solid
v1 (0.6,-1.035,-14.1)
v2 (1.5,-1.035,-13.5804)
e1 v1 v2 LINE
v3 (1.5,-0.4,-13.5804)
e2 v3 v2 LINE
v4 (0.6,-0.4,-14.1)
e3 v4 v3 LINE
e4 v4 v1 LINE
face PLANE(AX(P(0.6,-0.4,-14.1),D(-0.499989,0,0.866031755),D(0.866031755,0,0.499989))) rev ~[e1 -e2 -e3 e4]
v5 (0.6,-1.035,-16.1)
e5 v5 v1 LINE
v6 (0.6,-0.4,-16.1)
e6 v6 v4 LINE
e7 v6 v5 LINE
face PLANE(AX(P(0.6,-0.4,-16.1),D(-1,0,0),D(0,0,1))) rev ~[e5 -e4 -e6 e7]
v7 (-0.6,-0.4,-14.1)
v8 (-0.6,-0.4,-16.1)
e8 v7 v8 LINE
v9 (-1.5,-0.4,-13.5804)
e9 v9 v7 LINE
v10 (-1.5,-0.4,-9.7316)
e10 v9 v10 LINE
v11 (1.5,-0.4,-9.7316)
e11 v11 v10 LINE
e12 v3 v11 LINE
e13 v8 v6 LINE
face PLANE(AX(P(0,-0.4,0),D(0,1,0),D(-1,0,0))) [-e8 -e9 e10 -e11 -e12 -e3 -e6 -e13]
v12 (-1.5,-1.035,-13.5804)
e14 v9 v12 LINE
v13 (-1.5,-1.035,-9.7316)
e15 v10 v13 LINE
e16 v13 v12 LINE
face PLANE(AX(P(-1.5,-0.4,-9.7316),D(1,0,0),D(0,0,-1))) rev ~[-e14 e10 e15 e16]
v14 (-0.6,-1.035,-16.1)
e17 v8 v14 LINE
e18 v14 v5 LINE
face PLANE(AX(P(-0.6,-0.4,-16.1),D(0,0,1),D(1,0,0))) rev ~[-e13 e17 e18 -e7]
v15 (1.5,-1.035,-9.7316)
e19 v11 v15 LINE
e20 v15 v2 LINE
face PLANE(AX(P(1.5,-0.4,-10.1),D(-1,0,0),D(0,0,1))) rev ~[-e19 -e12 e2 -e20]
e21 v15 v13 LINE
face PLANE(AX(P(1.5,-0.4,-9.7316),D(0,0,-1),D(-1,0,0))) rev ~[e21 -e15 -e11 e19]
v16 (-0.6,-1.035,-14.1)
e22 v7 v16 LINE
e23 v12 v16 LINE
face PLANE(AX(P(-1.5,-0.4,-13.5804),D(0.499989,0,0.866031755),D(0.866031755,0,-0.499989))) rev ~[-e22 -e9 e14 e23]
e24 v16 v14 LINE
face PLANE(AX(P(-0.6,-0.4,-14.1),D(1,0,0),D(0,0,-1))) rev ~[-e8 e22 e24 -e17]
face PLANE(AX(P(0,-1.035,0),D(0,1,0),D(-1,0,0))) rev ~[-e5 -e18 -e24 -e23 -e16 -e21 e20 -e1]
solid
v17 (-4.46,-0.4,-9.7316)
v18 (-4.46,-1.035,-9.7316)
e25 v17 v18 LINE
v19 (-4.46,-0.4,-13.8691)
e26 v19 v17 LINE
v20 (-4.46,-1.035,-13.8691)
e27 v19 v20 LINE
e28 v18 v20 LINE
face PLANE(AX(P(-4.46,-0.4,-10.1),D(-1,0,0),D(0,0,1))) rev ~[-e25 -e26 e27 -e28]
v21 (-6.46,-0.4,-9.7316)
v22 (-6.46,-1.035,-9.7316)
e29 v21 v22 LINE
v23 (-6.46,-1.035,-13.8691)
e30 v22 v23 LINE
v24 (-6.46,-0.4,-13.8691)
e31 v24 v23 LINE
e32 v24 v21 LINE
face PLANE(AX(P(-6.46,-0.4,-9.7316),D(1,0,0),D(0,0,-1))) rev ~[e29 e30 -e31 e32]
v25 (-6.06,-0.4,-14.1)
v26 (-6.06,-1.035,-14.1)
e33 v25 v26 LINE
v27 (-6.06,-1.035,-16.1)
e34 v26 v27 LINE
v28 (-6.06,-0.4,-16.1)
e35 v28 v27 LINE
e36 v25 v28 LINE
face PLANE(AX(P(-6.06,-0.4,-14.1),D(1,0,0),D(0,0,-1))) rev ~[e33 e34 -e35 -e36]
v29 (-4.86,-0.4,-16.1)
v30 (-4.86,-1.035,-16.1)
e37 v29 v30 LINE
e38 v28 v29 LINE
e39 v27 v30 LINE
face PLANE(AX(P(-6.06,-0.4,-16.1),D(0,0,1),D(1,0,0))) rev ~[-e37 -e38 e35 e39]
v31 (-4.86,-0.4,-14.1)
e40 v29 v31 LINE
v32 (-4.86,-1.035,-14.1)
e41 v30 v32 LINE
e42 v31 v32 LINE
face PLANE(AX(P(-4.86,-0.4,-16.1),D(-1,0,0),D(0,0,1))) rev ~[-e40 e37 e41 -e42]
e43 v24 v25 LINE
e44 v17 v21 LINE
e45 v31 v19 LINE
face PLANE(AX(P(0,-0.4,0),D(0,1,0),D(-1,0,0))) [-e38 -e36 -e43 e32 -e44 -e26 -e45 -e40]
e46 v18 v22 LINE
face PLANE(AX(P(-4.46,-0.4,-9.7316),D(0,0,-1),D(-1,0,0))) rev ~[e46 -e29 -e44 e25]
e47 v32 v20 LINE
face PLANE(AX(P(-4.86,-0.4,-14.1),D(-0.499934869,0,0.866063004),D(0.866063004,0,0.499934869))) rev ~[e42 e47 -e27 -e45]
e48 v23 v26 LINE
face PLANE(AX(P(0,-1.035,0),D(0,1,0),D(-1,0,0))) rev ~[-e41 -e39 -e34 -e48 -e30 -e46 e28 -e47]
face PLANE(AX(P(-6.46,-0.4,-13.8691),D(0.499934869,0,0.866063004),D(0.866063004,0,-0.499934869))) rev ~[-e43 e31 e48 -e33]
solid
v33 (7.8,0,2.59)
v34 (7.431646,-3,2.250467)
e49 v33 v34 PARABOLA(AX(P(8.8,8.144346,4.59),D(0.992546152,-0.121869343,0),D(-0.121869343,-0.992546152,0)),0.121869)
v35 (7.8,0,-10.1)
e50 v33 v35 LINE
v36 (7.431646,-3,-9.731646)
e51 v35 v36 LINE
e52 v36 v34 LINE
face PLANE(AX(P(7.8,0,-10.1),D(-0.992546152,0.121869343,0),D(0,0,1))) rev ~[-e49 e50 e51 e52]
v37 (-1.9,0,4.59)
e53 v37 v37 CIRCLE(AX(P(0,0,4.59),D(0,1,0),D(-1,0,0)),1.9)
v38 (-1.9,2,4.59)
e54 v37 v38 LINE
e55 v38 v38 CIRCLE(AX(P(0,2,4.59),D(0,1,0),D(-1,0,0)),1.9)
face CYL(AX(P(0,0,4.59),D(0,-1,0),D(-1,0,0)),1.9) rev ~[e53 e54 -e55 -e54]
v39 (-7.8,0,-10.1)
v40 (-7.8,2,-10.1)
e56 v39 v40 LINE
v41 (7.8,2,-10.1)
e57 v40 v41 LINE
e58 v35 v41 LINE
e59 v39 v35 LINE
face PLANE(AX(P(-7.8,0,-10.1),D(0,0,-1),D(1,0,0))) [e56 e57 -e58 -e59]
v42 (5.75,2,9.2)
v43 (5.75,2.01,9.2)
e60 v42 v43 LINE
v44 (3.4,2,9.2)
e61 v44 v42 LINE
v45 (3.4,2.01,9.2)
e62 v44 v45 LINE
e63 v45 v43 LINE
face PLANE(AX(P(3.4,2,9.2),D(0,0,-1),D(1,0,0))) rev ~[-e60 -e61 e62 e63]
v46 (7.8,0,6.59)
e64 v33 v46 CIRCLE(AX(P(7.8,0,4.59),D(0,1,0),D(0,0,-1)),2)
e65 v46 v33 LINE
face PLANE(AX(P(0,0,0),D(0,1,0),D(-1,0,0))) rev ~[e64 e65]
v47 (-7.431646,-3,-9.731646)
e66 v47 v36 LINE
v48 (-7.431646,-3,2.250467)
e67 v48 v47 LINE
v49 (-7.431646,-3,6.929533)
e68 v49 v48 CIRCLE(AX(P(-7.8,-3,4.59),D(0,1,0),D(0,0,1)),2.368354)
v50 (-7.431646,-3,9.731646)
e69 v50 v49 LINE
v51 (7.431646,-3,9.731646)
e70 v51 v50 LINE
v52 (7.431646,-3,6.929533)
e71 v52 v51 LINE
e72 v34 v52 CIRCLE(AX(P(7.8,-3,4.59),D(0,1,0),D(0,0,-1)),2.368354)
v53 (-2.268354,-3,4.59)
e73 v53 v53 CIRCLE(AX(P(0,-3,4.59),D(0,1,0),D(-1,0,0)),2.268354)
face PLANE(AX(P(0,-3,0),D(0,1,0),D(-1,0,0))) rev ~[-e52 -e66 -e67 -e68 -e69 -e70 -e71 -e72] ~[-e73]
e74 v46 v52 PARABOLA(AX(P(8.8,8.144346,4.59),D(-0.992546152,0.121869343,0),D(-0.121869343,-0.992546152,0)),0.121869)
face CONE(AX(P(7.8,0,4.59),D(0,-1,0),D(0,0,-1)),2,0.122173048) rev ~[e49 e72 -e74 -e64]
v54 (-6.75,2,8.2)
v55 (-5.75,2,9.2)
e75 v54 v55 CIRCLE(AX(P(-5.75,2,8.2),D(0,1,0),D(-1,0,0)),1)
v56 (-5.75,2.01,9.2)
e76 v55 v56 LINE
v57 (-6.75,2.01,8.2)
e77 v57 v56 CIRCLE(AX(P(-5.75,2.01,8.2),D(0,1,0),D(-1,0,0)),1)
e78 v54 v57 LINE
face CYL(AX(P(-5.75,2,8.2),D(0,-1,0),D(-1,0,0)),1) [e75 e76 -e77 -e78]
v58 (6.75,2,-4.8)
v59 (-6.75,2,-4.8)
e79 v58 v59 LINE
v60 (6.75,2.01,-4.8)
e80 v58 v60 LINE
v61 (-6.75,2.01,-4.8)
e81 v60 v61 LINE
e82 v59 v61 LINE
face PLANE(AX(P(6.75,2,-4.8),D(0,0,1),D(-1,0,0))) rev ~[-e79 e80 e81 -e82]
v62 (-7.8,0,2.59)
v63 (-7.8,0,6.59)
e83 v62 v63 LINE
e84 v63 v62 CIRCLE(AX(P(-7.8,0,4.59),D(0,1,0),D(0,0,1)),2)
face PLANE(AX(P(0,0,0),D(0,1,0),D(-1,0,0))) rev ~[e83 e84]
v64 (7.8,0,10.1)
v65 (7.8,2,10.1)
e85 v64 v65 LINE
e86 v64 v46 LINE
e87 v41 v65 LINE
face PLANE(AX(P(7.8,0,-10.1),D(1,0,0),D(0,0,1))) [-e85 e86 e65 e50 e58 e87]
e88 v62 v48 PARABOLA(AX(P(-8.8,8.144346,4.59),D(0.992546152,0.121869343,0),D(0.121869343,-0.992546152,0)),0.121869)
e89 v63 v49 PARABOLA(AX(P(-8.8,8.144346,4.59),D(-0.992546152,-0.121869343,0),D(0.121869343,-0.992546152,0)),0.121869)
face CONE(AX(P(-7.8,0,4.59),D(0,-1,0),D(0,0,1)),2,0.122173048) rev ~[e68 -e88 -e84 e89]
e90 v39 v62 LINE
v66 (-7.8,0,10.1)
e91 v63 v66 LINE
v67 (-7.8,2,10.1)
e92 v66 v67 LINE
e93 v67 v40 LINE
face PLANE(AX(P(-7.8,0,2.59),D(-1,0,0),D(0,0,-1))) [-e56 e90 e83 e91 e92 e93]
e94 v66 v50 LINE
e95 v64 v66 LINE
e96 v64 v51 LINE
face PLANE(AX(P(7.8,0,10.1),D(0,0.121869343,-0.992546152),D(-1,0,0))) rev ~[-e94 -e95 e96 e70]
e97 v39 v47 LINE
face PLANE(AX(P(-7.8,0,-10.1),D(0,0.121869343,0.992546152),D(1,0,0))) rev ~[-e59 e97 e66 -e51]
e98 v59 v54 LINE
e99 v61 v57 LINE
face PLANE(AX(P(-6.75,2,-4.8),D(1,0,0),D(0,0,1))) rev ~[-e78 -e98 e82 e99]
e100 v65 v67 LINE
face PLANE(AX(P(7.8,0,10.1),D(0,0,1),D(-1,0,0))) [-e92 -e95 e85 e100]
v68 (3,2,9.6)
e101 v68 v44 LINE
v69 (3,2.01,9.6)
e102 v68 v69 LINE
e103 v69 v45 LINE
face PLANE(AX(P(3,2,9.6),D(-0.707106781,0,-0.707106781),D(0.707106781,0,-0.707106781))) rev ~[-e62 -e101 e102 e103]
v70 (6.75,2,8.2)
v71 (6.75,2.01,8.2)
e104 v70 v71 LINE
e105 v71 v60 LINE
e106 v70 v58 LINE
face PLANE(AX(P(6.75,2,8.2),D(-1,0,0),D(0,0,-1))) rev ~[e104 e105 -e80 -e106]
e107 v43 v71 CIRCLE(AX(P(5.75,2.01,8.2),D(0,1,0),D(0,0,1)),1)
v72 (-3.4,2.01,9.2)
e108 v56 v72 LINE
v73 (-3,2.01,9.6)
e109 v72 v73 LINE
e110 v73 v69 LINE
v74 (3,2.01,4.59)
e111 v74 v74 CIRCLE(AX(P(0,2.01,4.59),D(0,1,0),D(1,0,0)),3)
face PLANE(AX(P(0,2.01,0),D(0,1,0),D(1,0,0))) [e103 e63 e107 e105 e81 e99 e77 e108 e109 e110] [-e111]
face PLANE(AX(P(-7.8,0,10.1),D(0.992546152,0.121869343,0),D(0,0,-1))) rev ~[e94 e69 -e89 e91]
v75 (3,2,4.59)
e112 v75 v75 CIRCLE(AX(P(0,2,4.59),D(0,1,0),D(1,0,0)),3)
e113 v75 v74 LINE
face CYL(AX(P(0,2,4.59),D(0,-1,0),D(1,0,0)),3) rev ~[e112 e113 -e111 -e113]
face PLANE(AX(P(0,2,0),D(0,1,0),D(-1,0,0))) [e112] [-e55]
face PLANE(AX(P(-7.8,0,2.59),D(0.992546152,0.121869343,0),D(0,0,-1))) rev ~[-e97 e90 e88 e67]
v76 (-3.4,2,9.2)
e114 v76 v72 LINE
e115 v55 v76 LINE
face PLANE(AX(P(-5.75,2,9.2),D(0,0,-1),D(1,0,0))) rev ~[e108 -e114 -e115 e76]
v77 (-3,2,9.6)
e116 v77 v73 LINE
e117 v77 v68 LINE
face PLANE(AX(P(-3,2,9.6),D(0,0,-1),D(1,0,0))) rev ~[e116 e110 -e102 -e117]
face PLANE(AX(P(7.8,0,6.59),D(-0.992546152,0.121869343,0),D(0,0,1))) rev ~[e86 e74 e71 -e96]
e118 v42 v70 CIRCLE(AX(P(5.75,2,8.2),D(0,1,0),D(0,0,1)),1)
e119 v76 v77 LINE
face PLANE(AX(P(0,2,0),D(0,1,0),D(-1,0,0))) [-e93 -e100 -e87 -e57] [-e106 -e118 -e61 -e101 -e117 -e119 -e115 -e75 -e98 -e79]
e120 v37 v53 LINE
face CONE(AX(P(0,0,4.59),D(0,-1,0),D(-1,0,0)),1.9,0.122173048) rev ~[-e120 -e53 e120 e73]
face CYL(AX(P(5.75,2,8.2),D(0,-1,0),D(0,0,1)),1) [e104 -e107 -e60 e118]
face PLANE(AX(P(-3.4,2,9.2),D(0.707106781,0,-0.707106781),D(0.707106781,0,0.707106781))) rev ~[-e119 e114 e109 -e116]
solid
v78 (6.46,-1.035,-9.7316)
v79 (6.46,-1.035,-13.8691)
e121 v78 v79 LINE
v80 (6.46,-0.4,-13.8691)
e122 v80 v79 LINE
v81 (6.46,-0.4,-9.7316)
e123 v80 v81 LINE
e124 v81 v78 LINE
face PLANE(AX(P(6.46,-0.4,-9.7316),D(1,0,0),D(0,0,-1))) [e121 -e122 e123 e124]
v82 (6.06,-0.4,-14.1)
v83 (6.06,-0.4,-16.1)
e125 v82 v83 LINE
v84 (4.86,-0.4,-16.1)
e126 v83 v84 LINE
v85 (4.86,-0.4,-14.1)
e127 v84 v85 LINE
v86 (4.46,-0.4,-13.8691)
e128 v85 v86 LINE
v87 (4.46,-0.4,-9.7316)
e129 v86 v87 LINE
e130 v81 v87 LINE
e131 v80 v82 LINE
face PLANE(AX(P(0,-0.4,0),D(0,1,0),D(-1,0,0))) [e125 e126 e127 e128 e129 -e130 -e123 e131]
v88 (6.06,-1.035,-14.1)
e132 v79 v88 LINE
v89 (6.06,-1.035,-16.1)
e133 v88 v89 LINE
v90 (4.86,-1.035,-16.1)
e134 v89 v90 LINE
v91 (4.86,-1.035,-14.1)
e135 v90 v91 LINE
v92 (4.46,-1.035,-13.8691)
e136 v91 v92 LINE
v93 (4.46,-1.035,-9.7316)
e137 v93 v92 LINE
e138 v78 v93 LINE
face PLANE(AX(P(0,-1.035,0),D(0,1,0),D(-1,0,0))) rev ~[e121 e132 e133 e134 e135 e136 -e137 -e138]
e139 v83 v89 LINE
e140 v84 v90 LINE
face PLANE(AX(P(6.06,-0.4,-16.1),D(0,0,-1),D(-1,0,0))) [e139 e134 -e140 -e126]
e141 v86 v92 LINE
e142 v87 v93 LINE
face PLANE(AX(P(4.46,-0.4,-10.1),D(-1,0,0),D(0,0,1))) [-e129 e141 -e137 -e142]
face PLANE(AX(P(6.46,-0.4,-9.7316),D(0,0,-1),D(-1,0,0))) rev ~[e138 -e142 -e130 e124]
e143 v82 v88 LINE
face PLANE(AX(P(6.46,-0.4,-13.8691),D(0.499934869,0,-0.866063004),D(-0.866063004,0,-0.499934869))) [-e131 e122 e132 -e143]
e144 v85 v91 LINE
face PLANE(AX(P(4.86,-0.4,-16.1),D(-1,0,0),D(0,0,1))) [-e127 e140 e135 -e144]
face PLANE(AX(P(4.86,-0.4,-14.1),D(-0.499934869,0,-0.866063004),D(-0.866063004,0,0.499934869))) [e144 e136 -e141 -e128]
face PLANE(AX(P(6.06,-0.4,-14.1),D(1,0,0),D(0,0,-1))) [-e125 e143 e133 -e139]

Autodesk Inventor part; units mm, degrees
ref_plane "YZ Plane" through (0, 0, 0) normal (1, 0, 0) x (0, 1, 0)
ref_plane "XY Plane" through (0, 0, 0) normal (0, 0, 1) x (1, 0, 0)
sketch "Sketch1" plane through (0, 0, 0) normal (0, 1, 0) x (-1, 0, 0)
  line L0 (7.8, -10.1) -> (-7.8, -10.1)
  line L1 (-7.8, -10.1) -> (-7.8, 10.1)
  line L2 (-7.8, 10.1) -> (7.8, 10.1)
  line L3 (7.8, 10.1) -> (7.8, -10.1)
  line L4 (7.8, -10.1) -> (-7.8, 10.1) construction
  line L5 (-7.8, -10.1) -> (7.8, 10.1) construction
  circle A0 centre (0, 4.59) radius 1.9
  arc A1 (-7.8, 2.59) -> (-7.8, 6.59) centre (-7.8, 4.59) ccw
  arc A2 (7.8, 6.59) -> (7.8, 2.59) centre (7.8, 4.59) ccw
  point P0 (0, 0)
  point P1 (0, 10.1)
  dimension "d0" = 20.2
  dimension "d1" = 15.6
  dimension "d39" = 3.8
  dimension "d40" = 5.51
  dimension "d41" = 4
extrude "Extrusion6" add sketch "Sketch1" along normal blind 2
extrude "Extrusion7" add sketch "Sketch1" against normal blind 3 draft -7 contours L0 L1 A1 L2 L3 A2
ref_plane "Work Plane1" through (0, -0.4, 0) normal (0, 1, 0) x (-1, 0, 0)
sketch "Sketch4" plane through (0, -0.4, 0) normal (0, 1, 0) x (-1, 0, 0)
  line L0 (-7.8, -10.1) -> (7.8, -10.1) projected
  line L1 (-7.4316, -9.7316) -> (7.4316, -9.7316) projected
  line L2 (6.46, -9.7316) -> (6.46, -13.8691)
  line L3 (6.46, -13.8691) -> (6.06, -14.1)
  line L4 (6.06, -14.1) -> (6.06, -16.1)
  line L5 (4.86, -16.1) -> (4.86, -14.1)
  line L6 (4.86, -14.1) -> (4.46, -13.8691)
  line L7 (4.46, -13.8691) -> (4.46, -9.7316)
  line L8 (6.06, -16.1) -> (4.86, -16.1)
  line L9 (6.46, -9.7316) -> (4.46, -9.7316)
  line L10 (0, 0) -> (0, -9.7316) construction
  line L11 (-6.46, -9.7316) -> (-6.46, -13.8691)
  line L12 (-6.46, -13.8691) -> (-6.06, -14.1)
  line L13 (-6.06, -14.1) -> (-6.06, -16.1)
  line L14 (-4.86, -16.1) -> (-4.86, -14.1)
  line L15 (-4.86, -14.1) -> (-4.46, -13.8691)
  line L16 (-4.46, -13.8691) -> (-4.46, -9.7316)
  line L17 (-6.06, -16.1) -> (-4.86, -16.1)
  line L18 (-6.46, -9.7316) -> (-4.46, -9.7316)
  line L19 (1.5, -9.7316) -> (1.5, -13.5804)
  line L20 (1.5, -13.5804) -> (0.6, -14.1)
  line L21 (0.6, -14.1) -> (0.6, -16.1)
  line L22 (0.6, -16.1) -> (-0.6, -16.1)
  line L23 (-0.6, -16.1) -> (-0.6, -14.1)
  line L24 (-0.6, -14.1) -> (-1.5, -13.5804)
  line L25 (-1.5, -13.5804) -> (-1.5, -9.7316)
  line L26 (1.5, -9.7316) -> (-1.5, -9.7316)
  point P0 (5.46, -16.1)
  point P1 (-5.46, -16.1)
  dimension "d46" = 2
  dimension "d47" = 1.2
  dimension "d48" = 4
  dimension "d51" = 120
  dimension "d53" = 2
  dimension "d54" = 5.46
  dimension "d55" = 3
extrude "Extrusion4" add sketch "Sketch4" against normal blind 0.635 separate body contours L11 L1 L16 L0 | L0 L16 L15 L14 L17 L13 L12 L11 | L25 L1 L19 L0 | L0 L19 L20 L21 L22 L23 L24 L25 | L7 L1 L2 L0 | L0 L2 L3 L4 L8 L5 L6 L7
sketch "Sketch6" plane through (0, 2, 0) normal (0, 1, 0) x (1, 0, 0)
  circle A0 centre (0, -4.59) radius 1.9 projected
  line L0 (7.8, -10.1) -> (7.8, 10.1) projected
  line L1 (7.8, 10.1) -> (-7.8, 10.1) projected
  line L2 (-7.8, 10.1) -> (-7.8, -10.1) projected
  line L3 (-7.8, -10.1) -> (7.8, -10.1) projected
  line L4 (6.75, 4.8) -> (-6.75, 4.8)
  line L5 (-6.75, 4.8) -> (-6.75, -8.2)
  arc A1 (-6.75, -8.2) -> (-5.75, -9.2) centre (-5.75, -8.2) ccw
  line L6 (-5.75, -9.2) -> (-3.4, -9.2)
  line L7 (-3.4, -9.2) -> (-3, -9.6)
  line L8 (-3, -9.6) -> (3, -9.6)
  line L9 (3, -9.6) -> (3.4, -9.2)
  line L10 (3.4, -9.2) -> (5.75, -9.2)
  arc A2 (5.75, -9.2) -> (6.75, -8.2) centre (5.75, -8.2) ccw
  line L11 (6.75, -8.2) -> (6.75, 4.8)
  circle A3 centre (0, -4.59) radius 3
  point P0 (0, 0)
  point P1 (0, -9.6)
  point P2 (0, 4.8)
  dimension "d56" = 13.5
  dimension "d57" = 0.9
  dimension "d58" = 14
  dimension "d59" = 6
  dimension "d60" = 1
  dimension "d61" = 0.4
  dimension "d62" = 6
extrude "Extrusion8" add sketch "Sketch6" along normal blind 0.01 contours L11 A2 L10 L9 L8 L7 L6 A1 L5 L4 bodies 1
properties part number "Resistor_TH-TO220" material "ABS Plastic"
